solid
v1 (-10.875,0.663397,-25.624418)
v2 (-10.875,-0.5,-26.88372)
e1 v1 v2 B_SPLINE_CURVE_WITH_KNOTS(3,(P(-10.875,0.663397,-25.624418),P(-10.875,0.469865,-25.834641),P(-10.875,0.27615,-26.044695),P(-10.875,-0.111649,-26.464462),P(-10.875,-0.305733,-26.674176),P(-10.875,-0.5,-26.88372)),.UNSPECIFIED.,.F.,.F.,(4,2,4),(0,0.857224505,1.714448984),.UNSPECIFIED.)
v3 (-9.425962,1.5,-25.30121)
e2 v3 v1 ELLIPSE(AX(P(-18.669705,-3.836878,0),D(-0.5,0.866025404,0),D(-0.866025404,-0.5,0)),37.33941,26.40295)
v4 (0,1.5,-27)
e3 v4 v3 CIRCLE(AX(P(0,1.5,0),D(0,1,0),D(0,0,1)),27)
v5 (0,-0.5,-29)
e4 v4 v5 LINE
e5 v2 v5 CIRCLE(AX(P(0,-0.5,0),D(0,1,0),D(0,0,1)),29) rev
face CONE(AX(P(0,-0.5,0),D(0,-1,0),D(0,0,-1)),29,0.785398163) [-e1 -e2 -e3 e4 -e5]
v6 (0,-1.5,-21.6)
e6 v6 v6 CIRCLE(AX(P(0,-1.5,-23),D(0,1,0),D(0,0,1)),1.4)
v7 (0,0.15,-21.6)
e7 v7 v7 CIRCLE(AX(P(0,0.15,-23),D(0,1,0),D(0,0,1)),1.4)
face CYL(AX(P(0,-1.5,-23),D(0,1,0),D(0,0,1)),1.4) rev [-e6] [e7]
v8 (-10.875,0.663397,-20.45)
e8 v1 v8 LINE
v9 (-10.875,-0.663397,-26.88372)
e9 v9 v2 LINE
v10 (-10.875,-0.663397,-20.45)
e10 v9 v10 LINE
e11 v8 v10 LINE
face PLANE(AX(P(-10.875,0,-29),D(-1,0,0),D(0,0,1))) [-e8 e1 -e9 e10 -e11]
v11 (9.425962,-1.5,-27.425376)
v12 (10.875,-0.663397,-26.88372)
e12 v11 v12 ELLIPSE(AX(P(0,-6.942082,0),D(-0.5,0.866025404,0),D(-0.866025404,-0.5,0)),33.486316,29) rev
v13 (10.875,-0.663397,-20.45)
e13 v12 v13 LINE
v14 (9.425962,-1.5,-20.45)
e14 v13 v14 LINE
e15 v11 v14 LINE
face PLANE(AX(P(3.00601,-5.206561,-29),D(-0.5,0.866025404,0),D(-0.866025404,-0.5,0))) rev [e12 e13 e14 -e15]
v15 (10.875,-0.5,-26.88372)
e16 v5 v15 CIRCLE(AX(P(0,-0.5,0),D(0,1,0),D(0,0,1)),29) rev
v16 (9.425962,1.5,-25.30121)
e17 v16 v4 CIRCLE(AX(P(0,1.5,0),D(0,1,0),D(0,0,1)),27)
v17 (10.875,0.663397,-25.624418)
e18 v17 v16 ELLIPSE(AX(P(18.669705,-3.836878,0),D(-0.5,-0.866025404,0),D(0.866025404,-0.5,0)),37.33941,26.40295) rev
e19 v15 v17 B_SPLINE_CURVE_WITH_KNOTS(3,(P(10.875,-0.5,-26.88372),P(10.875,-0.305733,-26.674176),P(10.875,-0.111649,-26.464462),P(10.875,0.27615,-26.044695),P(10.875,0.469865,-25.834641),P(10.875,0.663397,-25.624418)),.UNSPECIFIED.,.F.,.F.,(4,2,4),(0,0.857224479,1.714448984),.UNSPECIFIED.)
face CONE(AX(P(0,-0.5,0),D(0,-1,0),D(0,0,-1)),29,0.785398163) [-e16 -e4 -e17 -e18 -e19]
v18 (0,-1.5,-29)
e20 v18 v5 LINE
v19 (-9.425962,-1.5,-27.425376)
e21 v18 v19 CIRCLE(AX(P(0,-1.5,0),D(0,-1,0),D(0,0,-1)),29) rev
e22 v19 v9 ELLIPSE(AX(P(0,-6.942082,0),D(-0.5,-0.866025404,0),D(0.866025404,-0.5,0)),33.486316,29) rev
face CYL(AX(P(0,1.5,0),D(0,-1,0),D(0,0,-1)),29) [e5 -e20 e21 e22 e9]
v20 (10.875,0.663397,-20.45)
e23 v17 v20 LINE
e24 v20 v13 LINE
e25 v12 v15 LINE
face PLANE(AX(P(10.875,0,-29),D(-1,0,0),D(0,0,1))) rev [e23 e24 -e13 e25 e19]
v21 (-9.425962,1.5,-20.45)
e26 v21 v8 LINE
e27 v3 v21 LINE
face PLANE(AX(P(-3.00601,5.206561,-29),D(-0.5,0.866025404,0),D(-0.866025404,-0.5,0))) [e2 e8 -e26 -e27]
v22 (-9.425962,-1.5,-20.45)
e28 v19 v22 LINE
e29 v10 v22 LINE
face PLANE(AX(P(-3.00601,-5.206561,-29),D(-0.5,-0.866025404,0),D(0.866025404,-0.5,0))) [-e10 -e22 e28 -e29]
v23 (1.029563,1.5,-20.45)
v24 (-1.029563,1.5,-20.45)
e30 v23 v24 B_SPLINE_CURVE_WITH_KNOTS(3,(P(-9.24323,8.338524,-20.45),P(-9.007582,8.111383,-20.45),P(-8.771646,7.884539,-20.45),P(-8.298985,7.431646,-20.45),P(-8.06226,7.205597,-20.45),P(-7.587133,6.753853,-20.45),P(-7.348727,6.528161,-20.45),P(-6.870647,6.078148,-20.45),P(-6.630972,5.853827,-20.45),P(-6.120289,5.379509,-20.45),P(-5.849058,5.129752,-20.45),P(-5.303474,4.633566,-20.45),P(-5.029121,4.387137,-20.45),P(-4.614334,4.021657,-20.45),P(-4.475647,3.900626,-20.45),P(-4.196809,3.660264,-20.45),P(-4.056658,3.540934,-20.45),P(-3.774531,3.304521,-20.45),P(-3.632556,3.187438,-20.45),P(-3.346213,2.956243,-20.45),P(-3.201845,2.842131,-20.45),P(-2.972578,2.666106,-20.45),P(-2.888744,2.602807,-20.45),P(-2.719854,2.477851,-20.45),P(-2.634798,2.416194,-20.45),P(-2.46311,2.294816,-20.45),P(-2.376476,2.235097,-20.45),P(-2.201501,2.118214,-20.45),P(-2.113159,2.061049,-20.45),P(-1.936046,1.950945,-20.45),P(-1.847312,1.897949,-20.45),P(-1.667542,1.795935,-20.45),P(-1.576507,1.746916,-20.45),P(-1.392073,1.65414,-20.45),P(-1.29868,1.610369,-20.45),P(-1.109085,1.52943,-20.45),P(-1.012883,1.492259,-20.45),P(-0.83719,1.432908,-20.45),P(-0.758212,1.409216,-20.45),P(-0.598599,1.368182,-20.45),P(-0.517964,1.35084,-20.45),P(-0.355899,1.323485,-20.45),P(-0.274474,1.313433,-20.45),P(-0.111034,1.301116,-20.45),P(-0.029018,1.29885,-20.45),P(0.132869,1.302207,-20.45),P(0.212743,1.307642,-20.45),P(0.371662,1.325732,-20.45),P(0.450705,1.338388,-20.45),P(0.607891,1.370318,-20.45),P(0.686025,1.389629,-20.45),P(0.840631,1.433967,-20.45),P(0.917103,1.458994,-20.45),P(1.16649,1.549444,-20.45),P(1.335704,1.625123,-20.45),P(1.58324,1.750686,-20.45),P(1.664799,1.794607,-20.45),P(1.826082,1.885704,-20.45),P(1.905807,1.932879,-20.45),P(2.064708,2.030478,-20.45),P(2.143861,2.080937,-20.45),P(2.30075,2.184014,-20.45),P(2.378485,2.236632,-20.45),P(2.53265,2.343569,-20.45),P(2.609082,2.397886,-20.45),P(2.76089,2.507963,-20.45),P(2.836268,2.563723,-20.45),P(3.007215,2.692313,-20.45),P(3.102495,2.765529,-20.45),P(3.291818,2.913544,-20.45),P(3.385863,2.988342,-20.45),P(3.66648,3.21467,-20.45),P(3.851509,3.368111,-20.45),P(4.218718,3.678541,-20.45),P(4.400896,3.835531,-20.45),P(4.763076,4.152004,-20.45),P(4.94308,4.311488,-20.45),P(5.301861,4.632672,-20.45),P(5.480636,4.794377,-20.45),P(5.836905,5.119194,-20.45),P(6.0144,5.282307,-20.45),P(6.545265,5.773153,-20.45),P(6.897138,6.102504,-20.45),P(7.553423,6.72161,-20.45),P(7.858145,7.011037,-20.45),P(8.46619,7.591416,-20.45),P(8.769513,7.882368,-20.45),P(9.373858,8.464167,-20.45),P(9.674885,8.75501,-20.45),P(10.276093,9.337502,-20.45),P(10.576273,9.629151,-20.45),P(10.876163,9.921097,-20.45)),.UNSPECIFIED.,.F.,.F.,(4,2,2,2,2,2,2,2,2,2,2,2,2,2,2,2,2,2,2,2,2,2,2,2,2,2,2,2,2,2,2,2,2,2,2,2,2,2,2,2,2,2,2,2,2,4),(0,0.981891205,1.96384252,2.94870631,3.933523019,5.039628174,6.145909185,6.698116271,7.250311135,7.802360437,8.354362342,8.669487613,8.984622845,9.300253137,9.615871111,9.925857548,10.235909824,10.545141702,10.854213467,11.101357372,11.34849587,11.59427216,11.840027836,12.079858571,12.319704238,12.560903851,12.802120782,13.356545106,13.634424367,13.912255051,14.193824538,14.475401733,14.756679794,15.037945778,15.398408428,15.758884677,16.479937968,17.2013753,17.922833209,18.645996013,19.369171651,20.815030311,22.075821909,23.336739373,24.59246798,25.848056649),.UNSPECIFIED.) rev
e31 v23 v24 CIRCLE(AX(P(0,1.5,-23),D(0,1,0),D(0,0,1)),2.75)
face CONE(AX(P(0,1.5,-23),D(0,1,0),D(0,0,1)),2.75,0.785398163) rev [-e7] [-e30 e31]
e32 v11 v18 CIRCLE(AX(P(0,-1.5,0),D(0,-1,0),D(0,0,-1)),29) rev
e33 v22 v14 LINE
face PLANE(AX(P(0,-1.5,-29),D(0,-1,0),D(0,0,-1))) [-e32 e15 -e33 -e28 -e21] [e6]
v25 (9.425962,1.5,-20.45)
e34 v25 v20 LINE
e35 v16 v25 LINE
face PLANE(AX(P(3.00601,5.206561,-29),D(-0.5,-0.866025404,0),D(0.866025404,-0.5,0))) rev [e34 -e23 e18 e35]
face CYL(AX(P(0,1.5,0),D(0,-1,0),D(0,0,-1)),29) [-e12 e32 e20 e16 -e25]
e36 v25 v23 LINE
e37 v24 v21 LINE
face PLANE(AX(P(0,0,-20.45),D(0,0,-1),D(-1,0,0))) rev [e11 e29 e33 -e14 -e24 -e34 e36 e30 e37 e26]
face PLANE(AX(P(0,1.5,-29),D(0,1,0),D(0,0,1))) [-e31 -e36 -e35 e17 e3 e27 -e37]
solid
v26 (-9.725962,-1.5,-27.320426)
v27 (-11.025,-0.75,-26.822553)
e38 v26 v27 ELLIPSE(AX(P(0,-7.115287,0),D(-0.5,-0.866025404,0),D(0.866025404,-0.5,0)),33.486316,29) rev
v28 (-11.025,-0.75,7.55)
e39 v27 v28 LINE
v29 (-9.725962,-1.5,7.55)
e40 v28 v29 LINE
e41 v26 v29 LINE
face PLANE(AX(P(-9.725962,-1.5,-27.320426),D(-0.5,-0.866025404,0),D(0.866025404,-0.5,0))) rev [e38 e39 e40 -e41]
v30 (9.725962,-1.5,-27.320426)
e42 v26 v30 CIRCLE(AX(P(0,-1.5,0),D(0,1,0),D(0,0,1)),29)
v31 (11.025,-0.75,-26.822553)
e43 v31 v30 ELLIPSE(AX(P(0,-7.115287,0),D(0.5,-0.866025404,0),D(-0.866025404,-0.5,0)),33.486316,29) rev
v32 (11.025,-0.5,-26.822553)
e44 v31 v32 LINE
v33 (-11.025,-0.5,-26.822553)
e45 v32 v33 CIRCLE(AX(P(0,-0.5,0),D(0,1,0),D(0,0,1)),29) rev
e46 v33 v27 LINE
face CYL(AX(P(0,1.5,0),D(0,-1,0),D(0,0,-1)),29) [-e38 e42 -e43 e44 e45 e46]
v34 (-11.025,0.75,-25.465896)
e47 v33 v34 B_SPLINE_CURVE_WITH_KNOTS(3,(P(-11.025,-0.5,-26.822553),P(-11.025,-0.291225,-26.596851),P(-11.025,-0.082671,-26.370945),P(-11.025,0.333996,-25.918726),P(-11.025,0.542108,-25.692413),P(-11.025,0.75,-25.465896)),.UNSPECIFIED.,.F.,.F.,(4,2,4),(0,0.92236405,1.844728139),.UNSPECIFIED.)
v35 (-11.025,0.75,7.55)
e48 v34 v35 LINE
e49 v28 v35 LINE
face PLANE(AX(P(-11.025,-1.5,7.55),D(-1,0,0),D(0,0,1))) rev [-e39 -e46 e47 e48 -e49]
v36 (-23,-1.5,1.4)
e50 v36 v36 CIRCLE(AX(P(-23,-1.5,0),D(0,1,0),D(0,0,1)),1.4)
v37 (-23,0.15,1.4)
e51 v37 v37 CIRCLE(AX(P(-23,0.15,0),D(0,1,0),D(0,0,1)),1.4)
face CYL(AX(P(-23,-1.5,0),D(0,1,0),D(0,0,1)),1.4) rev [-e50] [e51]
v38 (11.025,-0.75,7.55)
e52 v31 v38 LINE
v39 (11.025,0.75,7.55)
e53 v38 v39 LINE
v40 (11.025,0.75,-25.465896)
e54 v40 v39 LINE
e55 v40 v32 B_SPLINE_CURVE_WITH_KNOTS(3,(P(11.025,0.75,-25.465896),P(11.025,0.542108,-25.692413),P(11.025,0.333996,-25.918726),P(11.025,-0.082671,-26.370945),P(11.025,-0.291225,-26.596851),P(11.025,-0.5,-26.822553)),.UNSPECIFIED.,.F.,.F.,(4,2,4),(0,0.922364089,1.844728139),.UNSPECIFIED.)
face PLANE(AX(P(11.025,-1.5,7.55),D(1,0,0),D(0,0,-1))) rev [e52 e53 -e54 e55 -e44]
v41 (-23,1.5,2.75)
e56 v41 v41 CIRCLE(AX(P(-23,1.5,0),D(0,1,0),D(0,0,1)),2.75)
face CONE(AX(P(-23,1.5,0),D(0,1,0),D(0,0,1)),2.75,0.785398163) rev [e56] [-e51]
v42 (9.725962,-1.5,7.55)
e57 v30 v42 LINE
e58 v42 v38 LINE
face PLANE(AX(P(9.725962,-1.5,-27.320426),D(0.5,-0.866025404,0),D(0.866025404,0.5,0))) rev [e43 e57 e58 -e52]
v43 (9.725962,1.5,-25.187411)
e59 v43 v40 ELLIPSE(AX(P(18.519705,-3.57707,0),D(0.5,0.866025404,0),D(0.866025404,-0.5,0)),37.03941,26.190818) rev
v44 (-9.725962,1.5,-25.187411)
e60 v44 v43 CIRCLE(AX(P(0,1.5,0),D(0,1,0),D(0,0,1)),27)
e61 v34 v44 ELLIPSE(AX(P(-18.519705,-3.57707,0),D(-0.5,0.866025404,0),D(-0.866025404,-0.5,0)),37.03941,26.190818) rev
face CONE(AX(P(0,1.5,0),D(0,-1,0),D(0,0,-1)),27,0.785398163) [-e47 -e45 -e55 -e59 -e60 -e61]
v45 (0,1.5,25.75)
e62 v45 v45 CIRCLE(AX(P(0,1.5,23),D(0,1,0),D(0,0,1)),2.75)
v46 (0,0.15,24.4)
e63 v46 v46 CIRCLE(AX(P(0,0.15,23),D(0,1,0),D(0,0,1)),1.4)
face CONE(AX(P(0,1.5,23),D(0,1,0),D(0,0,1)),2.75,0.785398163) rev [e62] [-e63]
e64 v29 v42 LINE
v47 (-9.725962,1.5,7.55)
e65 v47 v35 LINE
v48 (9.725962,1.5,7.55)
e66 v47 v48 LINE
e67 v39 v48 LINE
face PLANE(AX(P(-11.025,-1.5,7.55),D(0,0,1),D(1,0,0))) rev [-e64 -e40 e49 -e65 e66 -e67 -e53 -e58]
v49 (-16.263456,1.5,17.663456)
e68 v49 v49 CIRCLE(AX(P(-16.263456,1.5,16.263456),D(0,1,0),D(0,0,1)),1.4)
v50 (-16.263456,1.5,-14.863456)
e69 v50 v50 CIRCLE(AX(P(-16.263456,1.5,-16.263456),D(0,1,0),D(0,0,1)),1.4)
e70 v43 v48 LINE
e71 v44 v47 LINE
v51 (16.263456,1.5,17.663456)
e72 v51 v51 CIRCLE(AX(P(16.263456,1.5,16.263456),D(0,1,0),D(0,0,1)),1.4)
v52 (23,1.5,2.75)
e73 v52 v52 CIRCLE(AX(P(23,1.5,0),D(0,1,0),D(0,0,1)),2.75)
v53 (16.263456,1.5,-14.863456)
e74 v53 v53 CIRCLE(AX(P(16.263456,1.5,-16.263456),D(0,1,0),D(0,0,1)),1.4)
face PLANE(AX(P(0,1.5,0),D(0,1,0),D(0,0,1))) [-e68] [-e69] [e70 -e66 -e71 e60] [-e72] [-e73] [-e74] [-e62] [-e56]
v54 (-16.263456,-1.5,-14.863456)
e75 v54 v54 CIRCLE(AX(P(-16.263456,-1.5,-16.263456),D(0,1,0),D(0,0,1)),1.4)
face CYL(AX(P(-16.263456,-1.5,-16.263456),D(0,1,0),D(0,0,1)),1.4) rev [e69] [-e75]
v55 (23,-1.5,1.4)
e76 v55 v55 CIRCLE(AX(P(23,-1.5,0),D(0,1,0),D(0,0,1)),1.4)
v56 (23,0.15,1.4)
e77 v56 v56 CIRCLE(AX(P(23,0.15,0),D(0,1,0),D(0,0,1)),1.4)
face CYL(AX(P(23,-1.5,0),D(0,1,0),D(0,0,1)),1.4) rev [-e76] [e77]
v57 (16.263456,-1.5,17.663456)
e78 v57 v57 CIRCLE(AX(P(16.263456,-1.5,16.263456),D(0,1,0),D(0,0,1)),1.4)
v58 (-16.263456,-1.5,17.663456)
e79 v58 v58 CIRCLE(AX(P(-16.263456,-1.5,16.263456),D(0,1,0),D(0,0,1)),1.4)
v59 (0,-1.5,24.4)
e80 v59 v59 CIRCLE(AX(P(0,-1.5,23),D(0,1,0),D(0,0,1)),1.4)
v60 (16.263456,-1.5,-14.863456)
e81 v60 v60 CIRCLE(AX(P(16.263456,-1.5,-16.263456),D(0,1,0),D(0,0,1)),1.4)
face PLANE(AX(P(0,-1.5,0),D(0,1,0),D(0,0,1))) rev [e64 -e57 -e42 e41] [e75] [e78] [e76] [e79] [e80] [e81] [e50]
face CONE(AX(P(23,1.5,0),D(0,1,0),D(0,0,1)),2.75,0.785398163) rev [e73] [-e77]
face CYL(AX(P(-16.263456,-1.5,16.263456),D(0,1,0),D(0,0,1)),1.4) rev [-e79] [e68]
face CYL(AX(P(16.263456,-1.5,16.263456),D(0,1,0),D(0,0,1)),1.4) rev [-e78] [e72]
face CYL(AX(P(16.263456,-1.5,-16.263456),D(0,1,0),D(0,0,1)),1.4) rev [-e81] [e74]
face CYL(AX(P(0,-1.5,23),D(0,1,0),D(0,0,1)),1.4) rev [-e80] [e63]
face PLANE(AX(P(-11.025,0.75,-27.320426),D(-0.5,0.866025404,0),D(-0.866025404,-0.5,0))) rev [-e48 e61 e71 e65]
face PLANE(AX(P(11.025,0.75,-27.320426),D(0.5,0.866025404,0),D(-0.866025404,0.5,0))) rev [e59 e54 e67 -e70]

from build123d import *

# Parameters (mm, degrees)
SKETCH1_R                                      = 29
BOSS_EXTRUDE1_DEPTH                            = 1.5
CUT_EXTRUDE1_DEPTH                             = 42.12177039
BOSS_EXTRUDE2_REACH                            = 46.997
BOSS_EXTRUDE2_END_RADIUS                       = 29
BOSS_EXTRUDE3_REACH                            = 59.346
BOSS_EXTRUDE3_END_RADIUS                       = 29
CHAMFER1_SIZE                                  = 2
CHAMFER2_SIZE                                  = 2
SKETCH5_R                                      = 1.4
CUT_EXTRUDE2_DEPTH                             = 42.12177039
CSK_FOR_M2_5_FLAT_HEAD_MACHINE_SCREW1_AT_COUNT = 2
CSK_FOR_M2_5_FLAT_HEAD_MACHINE_SCREW1_AT_PITCH = 32.526911935
CSK_FOR_M2_5_FLAT_HEAD_MACHINE_SCREW_2_COUNT   = 2
CSK_FOR_M2_5_FLAT_HEAD_MACHINE_SCREW_2_PITCH   = 46
CSK_FOR_M2_5_FLAT_HEAD_MACHINE_SCREW_3_COUNT   = 2
CSK_FOR_M2_5_FLAT_HEAD_MACHINE_SCREW_3_PITCH   = 32.526911935


with BuildPart() as part:
    # Sketch1 → Boss-Extrude1 (new, symmetric)
    with BuildSketch(Plane(origin=(0, 0, 0), x_dir=(1, 0, 0), z_dir=(0, 1, 0))):
        with Locations(Location((0, 0, 0), (0, 0, 270))):
            Circle(SKETCH1_R)
    extrude(amount=BOSS_EXTRUDE1_DEPTH, both=True)

    # Sketch2 → Cut-Extrude1 (cut, through all)
    with BuildSketch(Plane(origin=(0, 1.5, 0), x_dir=(1, 0, 0), z_dir=(0, 1, 0))):
        Polygon((-11.025, 7.55), (-11.025, 29), (11.025, 29), (11.025, 7.55), (11.025, -7.55), (-11.025, -7.55), align=None)
    extrude(amount=-CUT_EXTRUDE1_DEPTH, mode=Mode.SUBTRACT)

    # Boss-Extrude2: up to this cylinder (the profile starts inside it)
    boss_extrude2_end = Plane(origin=(0, -0.7325095, 0), z_dir=(0, -1, 0)) * Cylinder(BOSS_EXTRUDE2_END_RADIUS, 154.459019, mode=Mode.PRIVATE)
    # Sketch3 → Boss-Extrude2 (add, up to the surface)
    with BuildSketch(Plane(origin=(0, 0, 7.55), x_dir=(-1, 0, 0), z_dir=(0, 0, -1)), mode=Mode.PRIVATE) as boss_extrude2_sk1:
        Polygon((-11.525, -1.5), (-9.725961894, -1.5), (-11.025, -0.75), (-11.025, 0.75), (-9.725961894, 1.5), (-11.525, 1.5), align=None)
    boss_extrude2_tool1 = extrude(boss_extrude2_sk1.sketch, amount=BOSS_EXTRUDE2_REACH, mode=Mode.PRIVATE) & boss_extrude2_end
    add(boss_extrude2_tool1.solids().sort_by_distance((10.625481, -1.465019, 7.55))[0])
    # Sketch3 → Boss-Extrude2 (add, up to the surface)
    with BuildSketch(Plane(origin=(0, 0, 7.55), x_dir=(-1, 0, 0), z_dir=(0, 0, -1)), mode=Mode.PRIVATE) as boss_extrude2_sk2:
        Polygon((11.525, 1.5), (11.525, -1.5), (9.725961894, -1.5), (11.025, -0.75), (11.025, 0.75), (9.725961894, 1.5), align=None)
    boss_extrude2_tool2 = extrude(boss_extrude2_sk2.sketch, amount=BOSS_EXTRUDE2_REACH, mode=Mode.PRIVATE) & boss_extrude2_end
    add(boss_extrude2_tool2.solids().sort_by_distance((-11.490019, 0, 7.55))[0])

    # Chamfer1
    chamfer1_edges = [part.edges().sort_by_distance(p)[0] for p in [
        (0, 1.5, 29),
    ]]
    chamfer(chamfer1_edges, length=CHAMFER1_SIZE)


with BuildPart() as body_2:
    # Boss-Extrude3: up to this cylinder (the profile starts inside it)
    boss_extrude3_end = Plane(origin=(0, 0, 0), z_dir=(0, -1, 0)) * Cylinder(BOSS_EXTRUDE3_END_RADIUS, 177.692, mode=Mode.PRIVATE)
    # Sketch6 → Boss-Extrude3 (new, up to the surface)
    with BuildSketch(Plane(origin=(0, 0, -20.45), x_dir=(-1, 0, 0), z_dir=(0, 0, -1)), mode=Mode.PRIVATE) as boss_extrude3_sk1:
        Polygon((9.425961894, -1.5), (-9.425961894, -1.5), (-10.875, -0.66339746), (-10.875, 0.66339746), (-9.425961894, 1.5), (9.425961894, 1.5), (10.875, 0.66339746), (10.875, -0.66339746), align=None)
    boss_extrude3_tool1 = extrude(boss_extrude3_sk1.sketch, amount=BOSS_EXTRUDE3_REACH, mode=Mode.PRIVATE) & boss_extrude3_end
    add(boss_extrude3_tool1.solids().sort_by_distance((0, 0, -20.45))[0])

    # Chamfer2
    # the kernel refuses this chamfer: 2 mm, written as the material it takes off along each edge
    with BuildSketch(Plane(origin=(0, 1.5, 0), x_dir=(-0.48679499684040417, 0, -0.8735162454420358), z_dir=(-0.8735162454420358, 0, 0.48679499684040417))) as chamfer2_piece_1:
        Polygon((29 - CHAMFER2_SIZE, 0), (29, CHAMFER2_SIZE), (29, 0), align=None)
    revolve(axis=Axis((0, 1.5, 0), (0, -1, 0)), revolution_arc=58.260285593, mode=Mode.SUBTRACT)


with BuildPart() as cut_extrude2_tool:
    # Sketch5 → Cut-Extrude2 (new, through all)
    with BuildSketch(Plane(origin=(0, 1.5, 0), x_dir=(1, 0, 0), z_dir=(0, 1, 0))):
        with Locations(Location((0, 23, 0), (0, 0, 270))):
            Circle(SKETCH5_R)
        with Locations(Location((16.263455967, 16.263455967, 0), (0, 0, 270))):
            Circle(SKETCH5_R)
        with Locations(Location((23, 0, 0), (0, 0, 270))):
            Circle(SKETCH5_R)
        with Locations(Location((16.263455967, -16.263455967, 0), (0, 0, 270))):
            Circle(SKETCH5_R)
        with Locations(Location((0, -23, 0), (0, 0, 270))):
            Circle(SKETCH5_R)
        with Locations(Location((-16.263455967, -16.263455967, 0), (0, 0, 270))):
            Circle(SKETCH5_R)
        with Locations(Location((-23, 0, 0), (0, 0, 270))):
            Circle(SKETCH5_R)
        with Locations(Location((-16.263455967, 16.263455967, 0), (0, 0, 270))):
            Circle(SKETCH5_R)
    extrude(amount=-CUT_EXTRUDE2_DEPTH)


with BuildPart() as part_1:
    add(part.part)

    # Cut-Extrude2: cut by cut_extrude2_tool
    add(cut_extrude2_tool.part, mode=Mode.SUBTRACT)


with BuildPart() as body_2_1:
    add(body_2.part)

    # Cut-Extrude2: cut by cut_extrude2_tool
    add(cut_extrude2_tool.part, mode=Mode.SUBTRACT)

    # Sketch8 → CSK for M2.5 Flat Head Machine Screw1 (revolve, cut)
    with BuildSketch(Plane(origin=(0, 1.5, -23), x_dir=(0, 0, 1), z_dir=(1, 0, 0))):
        Polygon((0, 0), (0, 3), (1.35, 3), (1.35, 1.4), (2.75, 0), align=None)
    csk_for_m2_5_flat_head_machine_screw1 = revolve(axis=Axis((0, 7.85, -23), (0, -1, 0)), mode=Mode.SUBTRACT)


with BuildPart() as part_2:
    add(part_1.part)

    # CSK for M2.5 Flat Head Machine Screw1 at: CSK for M2.5 Flat Head Machine Screw1 ×2
    with Locations(*[Vector(0.707106781186556, 0, 0.7071067811865391) * (i * CSK_FOR_M2_5_FLAT_HEAD_MACHINE_SCREW1_AT_PITCH) for i in range(1, CSK_FOR_M2_5_FLAT_HEAD_MACHINE_SCREW1_AT_COUNT)]):
        add(csk_for_m2_5_flat_head_machine_screw1, mode=Mode.SUBTRACT)

    # CSK for M2.5 Flat Head Machine Screw 2: CSK for M2.5 Flat Head Machine Screw1 ×2
    with Locations(*[(0, 0, i * CSK_FOR_M2_5_FLAT_HEAD_MACHINE_SCREW_2_PITCH) for i in range(1, CSK_FOR_M2_5_FLAT_HEAD_MACHINE_SCREW_2_COUNT)]):
        add(csk_for_m2_5_flat_head_machine_screw1, mode=Mode.SUBTRACT)

    # CSK for M2.5 Flat Head Machine Screw 3: CSK for M2.5 Flat Head Machine Screw1 ×2
    with Locations(*[Vector(-0.7071067811865475, 0, 0.7071067811865476) * (i * CSK_FOR_M2_5_FLAT_HEAD_MACHINE_SCREW_3_PITCH) for i in range(1, CSK_FOR_M2_5_FLAT_HEAD_MACHINE_SCREW_3_COUNT)]):
        add(csk_for_m2_5_flat_head_machine_screw1, mode=Mode.SUBTRACT)


solid = Compound([body_2_1.part, part_2.part])
